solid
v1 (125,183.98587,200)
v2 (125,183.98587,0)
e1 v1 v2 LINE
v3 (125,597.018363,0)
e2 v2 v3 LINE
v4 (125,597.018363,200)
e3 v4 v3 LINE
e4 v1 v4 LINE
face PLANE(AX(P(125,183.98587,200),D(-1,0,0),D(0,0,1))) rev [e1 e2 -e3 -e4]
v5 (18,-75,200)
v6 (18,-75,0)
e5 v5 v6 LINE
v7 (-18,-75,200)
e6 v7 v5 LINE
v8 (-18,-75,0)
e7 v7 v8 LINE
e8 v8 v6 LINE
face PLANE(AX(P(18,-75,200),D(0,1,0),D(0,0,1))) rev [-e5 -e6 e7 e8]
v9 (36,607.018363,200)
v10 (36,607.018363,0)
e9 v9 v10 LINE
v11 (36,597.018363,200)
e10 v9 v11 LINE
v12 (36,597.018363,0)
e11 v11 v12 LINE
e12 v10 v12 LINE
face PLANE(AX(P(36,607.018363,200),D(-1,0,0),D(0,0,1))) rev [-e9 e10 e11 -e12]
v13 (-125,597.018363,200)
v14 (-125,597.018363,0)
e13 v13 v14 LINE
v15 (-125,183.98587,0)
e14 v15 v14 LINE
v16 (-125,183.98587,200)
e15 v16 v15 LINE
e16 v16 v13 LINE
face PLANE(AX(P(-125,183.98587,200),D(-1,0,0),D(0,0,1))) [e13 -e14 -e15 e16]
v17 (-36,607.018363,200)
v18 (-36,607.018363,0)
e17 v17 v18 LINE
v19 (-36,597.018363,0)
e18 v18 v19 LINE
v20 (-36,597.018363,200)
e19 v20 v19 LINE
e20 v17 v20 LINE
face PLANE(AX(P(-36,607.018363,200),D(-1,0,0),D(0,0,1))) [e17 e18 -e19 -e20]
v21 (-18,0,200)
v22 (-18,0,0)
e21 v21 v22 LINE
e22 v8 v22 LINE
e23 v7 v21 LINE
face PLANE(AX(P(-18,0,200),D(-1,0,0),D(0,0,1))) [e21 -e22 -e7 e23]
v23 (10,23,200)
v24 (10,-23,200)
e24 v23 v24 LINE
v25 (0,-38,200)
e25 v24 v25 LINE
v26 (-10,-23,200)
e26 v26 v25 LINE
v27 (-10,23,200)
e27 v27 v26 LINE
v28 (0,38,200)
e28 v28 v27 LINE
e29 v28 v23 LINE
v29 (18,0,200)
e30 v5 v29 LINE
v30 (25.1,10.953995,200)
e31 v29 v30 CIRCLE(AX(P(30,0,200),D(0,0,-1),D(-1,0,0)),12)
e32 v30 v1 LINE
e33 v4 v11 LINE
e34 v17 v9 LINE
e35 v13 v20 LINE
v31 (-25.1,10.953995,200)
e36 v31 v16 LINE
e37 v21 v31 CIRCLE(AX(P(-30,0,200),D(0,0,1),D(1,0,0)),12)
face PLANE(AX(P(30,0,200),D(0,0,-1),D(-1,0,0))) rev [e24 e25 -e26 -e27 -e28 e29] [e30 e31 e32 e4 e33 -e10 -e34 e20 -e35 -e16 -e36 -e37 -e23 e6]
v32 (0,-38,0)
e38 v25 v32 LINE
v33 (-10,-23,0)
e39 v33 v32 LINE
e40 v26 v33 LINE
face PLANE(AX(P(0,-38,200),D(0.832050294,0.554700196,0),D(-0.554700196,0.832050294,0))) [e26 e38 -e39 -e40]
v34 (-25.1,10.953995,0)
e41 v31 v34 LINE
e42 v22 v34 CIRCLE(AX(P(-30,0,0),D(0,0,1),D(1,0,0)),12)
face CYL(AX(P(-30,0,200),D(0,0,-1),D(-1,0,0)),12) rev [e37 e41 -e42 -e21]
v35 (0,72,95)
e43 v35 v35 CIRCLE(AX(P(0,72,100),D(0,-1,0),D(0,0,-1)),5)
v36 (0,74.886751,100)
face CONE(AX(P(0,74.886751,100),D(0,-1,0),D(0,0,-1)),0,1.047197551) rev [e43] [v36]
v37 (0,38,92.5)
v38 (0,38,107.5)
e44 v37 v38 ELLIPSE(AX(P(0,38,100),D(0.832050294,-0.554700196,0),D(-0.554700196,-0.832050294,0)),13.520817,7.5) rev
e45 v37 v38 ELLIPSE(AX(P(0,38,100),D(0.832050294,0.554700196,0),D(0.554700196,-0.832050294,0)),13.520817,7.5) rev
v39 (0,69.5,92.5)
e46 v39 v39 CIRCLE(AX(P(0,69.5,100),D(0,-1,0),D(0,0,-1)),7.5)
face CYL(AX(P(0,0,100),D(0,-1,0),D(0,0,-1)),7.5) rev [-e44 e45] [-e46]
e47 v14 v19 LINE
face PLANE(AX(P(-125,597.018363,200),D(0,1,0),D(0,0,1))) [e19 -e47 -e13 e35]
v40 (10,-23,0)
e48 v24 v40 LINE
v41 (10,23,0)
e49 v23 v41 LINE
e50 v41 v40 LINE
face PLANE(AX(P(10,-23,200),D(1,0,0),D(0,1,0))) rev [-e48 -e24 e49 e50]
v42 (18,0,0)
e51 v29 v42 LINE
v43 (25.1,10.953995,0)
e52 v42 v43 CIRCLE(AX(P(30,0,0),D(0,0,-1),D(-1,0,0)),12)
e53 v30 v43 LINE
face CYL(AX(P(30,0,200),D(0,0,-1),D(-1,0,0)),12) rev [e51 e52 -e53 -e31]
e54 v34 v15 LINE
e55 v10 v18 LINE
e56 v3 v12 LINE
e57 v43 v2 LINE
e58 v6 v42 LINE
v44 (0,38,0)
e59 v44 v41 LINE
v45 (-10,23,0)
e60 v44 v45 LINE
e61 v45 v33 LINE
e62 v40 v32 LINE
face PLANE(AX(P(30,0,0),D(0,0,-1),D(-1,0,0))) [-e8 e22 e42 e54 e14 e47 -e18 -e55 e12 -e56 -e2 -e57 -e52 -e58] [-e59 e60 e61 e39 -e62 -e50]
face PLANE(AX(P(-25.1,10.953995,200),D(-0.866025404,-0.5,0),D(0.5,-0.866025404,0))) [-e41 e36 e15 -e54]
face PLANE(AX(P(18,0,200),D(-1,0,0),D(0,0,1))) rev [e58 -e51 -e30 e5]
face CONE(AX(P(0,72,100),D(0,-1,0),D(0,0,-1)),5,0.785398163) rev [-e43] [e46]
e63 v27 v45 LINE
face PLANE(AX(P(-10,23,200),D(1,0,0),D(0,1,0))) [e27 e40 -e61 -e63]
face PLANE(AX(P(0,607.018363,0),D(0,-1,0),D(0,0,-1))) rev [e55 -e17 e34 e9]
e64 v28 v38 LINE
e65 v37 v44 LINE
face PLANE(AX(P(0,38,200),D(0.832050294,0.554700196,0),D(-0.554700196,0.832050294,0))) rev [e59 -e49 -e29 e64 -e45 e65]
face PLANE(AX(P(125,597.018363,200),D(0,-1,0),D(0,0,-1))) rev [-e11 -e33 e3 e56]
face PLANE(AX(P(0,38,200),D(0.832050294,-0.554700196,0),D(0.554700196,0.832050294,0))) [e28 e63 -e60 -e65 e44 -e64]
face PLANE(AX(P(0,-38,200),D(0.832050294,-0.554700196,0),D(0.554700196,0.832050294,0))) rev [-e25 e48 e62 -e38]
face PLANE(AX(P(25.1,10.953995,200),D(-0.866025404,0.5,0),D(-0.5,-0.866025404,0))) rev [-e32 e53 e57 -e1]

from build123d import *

# Parameters (mm, degrees)
AUFSATZ_LINEAR_AUSTRAGEN1_DEPTH = 200
AUFSATZ_LINEAR_AUSTRAGEN2_DEPTH = 10
SPIEGELN2_DEPTH                 = 96.337442911
SPIEGELN2_START                 = 104.471237307
SPIEGELN2_2_DEPTH               = 95.528762693
SPIEGELN2_START_2               = 96.337442911
SPIEGELN2_3_DEPTH               = 8.133794396


with BuildPart() as part:
    # Skizze1 → Aufsatz-Linear austragen1 (new body)
    with BuildSketch(Plane.XY):
        with BuildLine():
            Line((0, 38), (-1.4223e-13, 597.0183631567951))
            Line((-1.4223e-13, 597.0183631567951), (125, 597.0183631567951))
            Line((125, 597.0183631567951), (125, 183.98587038126252))
            Line((125, 183.98587038126252), (25.100000000000005, 10.953994705129267))
            ThreePointArc((25.100000000000005, 10.953994705129267), (19.930243299860727, 6.526867548832285), (18.000000000000007, -3.47e-15))
            Line((18.000000000000007, -3.47e-15), (18.000000000000007, -75))
            Line((18.000000000000007, -75), (0, -75))
            Line((0, -75), (0, -38.000000000000014))
            Line((0, -38.000000000000014), (10.000000000000002, -23.000000000000014))
            Line((10.000000000000002, -23.000000000000014), (10.000000000000007, -1.388e-14))
            Line((10.000000000000007, -1.388e-14), (10.000000000000002, 22.999999999999986))
            Line((10.000000000000002, 22.999999999999986), (0, 38))
        make_face()
    extrude(amount=AUFSATZ_LINEAR_AUSTRAGEN1_DEPTH)

    # Skizze2 → Aufsatz-Linear austragen2 (add)
    with BuildSketch(Plane(origin=(0, 597.0183631567951, 0), x_dir=(1, 0, 0), z_dir=(0, 1, 0))):
        Polygon((-1.4223e-13, -200), (35.99999999999986, -200), (35.999999999999865, 0), (1.225e-14, 0), align=None)
    extrude(amount=AUFSATZ_LINEAR_AUSTRAGEN2_DEPTH)

    # Skizze3 → Schnitt-Rotation1 (revolve, cut)
    with BuildSketch(Plane(origin=(0, 0, 0), x_dir=(0, 0, -1), z_dir=(1, 0, 0))):
        Polygon((-105.00000000000001, 72.00000000000001), (-107.50000000000001, 69.5), (-107.50000000000001, 0), (-100, 0), (-100, 72.00000000000001), (-100, 74.88675134594817), align=None)
    revolve(axis=Axis((0, 0, 100), (0, 1, 0)), mode=Mode.SUBTRACT)

    # Spiegeln2: read off the stored shape, not the designer's step
    # Spiegeln2 outline → Spiegeln2 (add)
    with BuildSketch(Plane.XY):
        with BuildLine():
            Line((-36, 607.018363157), (-36, 597.018363157))
            Line((-36, 597.018363157), (-125, 597.018363157))
            Line((-125, 597.018363157), (-125, 183.985870381))
            Line((-125, 183.985870381), (-25.1, 10.953994705))
            ThreePointArc((-25.1, 10.953994705), (-19.9302433, 6.526867549), (-18, 0))
            Line((-18, 0), (-18, -75))
            Line((-18, -75), (0, -75))
            Line((0, -75), (0, -38))
            Line((0, -38), (-10, -23))
            Line((-10, -23), (-10, 23))
            Line((-10, 23), (0, 38))
            Line((0, 38), (0, 607.018363157))
            Line((0, 607.018363157), (-36, 607.018363157))
        make_face()
    extrude(amount=SPIEGELN2_DEPTH)

    # Spiegeln2 2 outline → Spiegeln2 2 (add)
    with BuildSketch(Plane.XY.offset(SPIEGELN2_START)):
        with BuildLine():
            Line((-36, 607.018363157), (-36, 597.018363157))
            Line((-36, 597.018363157), (-125, 597.018363157))
            Line((-125, 597.018363157), (-125, 183.985870381))
            Line((-125, 183.985870381), (-25.1, 10.953994705))
            ThreePointArc((-25.1, 10.953994705), (-19.9302433, 6.526867549), (-18, 0))
            Line((-18, 0), (-18, -75))
            Line((-18, -75), (0, -75))
            Line((0, -75), (0, -38))
            Line((0, -38), (-10, -23))
            Line((-10, -23), (-10, 23))
            Line((-10, 23), (0, 38))
            Line((0, 38), (0, 607.018363157))
            Line((0, 607.018363157), (-36, 607.018363157))
        make_face()
    extrude(amount=SPIEGELN2_2_DEPTH)

    # Spiegeln2 3 outline → Spiegeln2 3 (add)
    with BuildSketch(Plane.XY.offset(SPIEGELN2_START_2)):
        with BuildLine():
            Line((-36, 607.018363157), (-36, 597.018363157))
            Line((-36, 597.018363157), (-125, 597.018363157))
            Line((-125, 597.018363157), (-125, 183.985870381))
            Line((-125, 183.985870381), (-25.1, 10.953994705))
            ThreePointArc((-25.1, 10.953994705), (-19.9302433, 6.526867549), (-18, 0))
            Line((-18, 0), (-18, -75))
            Line((-18, -75), (0, -75))
            Line((0, -75), (0, -38))
            Line((0, -38), (-10, -23))
            Line((-10, -23), (-10, 23))
            Line((-10, 23), (0, 38))
            Line((0, 38), (0, 607.018363157))
            Line((0, 607.018363157), (-36, 607.018363157))
        make_face()
    extrude(amount=SPIEGELN2_3_DEPTH)

    # Spiegeln2 4 outline → Spiegeln2 4 (revolve, cut)
    with BuildSketch(Plane.XY.offset(100)):
        Polygon((5, 72), (0, 74.886751346), (0, 26.711700462), (7.5, 26.711700462), (7.5, 69.5), align=None)
    revolve(axis=Axis((0, 0, 100), (0, 1, 0)), mode=Mode.SUBTRACT)


solid = part.part
